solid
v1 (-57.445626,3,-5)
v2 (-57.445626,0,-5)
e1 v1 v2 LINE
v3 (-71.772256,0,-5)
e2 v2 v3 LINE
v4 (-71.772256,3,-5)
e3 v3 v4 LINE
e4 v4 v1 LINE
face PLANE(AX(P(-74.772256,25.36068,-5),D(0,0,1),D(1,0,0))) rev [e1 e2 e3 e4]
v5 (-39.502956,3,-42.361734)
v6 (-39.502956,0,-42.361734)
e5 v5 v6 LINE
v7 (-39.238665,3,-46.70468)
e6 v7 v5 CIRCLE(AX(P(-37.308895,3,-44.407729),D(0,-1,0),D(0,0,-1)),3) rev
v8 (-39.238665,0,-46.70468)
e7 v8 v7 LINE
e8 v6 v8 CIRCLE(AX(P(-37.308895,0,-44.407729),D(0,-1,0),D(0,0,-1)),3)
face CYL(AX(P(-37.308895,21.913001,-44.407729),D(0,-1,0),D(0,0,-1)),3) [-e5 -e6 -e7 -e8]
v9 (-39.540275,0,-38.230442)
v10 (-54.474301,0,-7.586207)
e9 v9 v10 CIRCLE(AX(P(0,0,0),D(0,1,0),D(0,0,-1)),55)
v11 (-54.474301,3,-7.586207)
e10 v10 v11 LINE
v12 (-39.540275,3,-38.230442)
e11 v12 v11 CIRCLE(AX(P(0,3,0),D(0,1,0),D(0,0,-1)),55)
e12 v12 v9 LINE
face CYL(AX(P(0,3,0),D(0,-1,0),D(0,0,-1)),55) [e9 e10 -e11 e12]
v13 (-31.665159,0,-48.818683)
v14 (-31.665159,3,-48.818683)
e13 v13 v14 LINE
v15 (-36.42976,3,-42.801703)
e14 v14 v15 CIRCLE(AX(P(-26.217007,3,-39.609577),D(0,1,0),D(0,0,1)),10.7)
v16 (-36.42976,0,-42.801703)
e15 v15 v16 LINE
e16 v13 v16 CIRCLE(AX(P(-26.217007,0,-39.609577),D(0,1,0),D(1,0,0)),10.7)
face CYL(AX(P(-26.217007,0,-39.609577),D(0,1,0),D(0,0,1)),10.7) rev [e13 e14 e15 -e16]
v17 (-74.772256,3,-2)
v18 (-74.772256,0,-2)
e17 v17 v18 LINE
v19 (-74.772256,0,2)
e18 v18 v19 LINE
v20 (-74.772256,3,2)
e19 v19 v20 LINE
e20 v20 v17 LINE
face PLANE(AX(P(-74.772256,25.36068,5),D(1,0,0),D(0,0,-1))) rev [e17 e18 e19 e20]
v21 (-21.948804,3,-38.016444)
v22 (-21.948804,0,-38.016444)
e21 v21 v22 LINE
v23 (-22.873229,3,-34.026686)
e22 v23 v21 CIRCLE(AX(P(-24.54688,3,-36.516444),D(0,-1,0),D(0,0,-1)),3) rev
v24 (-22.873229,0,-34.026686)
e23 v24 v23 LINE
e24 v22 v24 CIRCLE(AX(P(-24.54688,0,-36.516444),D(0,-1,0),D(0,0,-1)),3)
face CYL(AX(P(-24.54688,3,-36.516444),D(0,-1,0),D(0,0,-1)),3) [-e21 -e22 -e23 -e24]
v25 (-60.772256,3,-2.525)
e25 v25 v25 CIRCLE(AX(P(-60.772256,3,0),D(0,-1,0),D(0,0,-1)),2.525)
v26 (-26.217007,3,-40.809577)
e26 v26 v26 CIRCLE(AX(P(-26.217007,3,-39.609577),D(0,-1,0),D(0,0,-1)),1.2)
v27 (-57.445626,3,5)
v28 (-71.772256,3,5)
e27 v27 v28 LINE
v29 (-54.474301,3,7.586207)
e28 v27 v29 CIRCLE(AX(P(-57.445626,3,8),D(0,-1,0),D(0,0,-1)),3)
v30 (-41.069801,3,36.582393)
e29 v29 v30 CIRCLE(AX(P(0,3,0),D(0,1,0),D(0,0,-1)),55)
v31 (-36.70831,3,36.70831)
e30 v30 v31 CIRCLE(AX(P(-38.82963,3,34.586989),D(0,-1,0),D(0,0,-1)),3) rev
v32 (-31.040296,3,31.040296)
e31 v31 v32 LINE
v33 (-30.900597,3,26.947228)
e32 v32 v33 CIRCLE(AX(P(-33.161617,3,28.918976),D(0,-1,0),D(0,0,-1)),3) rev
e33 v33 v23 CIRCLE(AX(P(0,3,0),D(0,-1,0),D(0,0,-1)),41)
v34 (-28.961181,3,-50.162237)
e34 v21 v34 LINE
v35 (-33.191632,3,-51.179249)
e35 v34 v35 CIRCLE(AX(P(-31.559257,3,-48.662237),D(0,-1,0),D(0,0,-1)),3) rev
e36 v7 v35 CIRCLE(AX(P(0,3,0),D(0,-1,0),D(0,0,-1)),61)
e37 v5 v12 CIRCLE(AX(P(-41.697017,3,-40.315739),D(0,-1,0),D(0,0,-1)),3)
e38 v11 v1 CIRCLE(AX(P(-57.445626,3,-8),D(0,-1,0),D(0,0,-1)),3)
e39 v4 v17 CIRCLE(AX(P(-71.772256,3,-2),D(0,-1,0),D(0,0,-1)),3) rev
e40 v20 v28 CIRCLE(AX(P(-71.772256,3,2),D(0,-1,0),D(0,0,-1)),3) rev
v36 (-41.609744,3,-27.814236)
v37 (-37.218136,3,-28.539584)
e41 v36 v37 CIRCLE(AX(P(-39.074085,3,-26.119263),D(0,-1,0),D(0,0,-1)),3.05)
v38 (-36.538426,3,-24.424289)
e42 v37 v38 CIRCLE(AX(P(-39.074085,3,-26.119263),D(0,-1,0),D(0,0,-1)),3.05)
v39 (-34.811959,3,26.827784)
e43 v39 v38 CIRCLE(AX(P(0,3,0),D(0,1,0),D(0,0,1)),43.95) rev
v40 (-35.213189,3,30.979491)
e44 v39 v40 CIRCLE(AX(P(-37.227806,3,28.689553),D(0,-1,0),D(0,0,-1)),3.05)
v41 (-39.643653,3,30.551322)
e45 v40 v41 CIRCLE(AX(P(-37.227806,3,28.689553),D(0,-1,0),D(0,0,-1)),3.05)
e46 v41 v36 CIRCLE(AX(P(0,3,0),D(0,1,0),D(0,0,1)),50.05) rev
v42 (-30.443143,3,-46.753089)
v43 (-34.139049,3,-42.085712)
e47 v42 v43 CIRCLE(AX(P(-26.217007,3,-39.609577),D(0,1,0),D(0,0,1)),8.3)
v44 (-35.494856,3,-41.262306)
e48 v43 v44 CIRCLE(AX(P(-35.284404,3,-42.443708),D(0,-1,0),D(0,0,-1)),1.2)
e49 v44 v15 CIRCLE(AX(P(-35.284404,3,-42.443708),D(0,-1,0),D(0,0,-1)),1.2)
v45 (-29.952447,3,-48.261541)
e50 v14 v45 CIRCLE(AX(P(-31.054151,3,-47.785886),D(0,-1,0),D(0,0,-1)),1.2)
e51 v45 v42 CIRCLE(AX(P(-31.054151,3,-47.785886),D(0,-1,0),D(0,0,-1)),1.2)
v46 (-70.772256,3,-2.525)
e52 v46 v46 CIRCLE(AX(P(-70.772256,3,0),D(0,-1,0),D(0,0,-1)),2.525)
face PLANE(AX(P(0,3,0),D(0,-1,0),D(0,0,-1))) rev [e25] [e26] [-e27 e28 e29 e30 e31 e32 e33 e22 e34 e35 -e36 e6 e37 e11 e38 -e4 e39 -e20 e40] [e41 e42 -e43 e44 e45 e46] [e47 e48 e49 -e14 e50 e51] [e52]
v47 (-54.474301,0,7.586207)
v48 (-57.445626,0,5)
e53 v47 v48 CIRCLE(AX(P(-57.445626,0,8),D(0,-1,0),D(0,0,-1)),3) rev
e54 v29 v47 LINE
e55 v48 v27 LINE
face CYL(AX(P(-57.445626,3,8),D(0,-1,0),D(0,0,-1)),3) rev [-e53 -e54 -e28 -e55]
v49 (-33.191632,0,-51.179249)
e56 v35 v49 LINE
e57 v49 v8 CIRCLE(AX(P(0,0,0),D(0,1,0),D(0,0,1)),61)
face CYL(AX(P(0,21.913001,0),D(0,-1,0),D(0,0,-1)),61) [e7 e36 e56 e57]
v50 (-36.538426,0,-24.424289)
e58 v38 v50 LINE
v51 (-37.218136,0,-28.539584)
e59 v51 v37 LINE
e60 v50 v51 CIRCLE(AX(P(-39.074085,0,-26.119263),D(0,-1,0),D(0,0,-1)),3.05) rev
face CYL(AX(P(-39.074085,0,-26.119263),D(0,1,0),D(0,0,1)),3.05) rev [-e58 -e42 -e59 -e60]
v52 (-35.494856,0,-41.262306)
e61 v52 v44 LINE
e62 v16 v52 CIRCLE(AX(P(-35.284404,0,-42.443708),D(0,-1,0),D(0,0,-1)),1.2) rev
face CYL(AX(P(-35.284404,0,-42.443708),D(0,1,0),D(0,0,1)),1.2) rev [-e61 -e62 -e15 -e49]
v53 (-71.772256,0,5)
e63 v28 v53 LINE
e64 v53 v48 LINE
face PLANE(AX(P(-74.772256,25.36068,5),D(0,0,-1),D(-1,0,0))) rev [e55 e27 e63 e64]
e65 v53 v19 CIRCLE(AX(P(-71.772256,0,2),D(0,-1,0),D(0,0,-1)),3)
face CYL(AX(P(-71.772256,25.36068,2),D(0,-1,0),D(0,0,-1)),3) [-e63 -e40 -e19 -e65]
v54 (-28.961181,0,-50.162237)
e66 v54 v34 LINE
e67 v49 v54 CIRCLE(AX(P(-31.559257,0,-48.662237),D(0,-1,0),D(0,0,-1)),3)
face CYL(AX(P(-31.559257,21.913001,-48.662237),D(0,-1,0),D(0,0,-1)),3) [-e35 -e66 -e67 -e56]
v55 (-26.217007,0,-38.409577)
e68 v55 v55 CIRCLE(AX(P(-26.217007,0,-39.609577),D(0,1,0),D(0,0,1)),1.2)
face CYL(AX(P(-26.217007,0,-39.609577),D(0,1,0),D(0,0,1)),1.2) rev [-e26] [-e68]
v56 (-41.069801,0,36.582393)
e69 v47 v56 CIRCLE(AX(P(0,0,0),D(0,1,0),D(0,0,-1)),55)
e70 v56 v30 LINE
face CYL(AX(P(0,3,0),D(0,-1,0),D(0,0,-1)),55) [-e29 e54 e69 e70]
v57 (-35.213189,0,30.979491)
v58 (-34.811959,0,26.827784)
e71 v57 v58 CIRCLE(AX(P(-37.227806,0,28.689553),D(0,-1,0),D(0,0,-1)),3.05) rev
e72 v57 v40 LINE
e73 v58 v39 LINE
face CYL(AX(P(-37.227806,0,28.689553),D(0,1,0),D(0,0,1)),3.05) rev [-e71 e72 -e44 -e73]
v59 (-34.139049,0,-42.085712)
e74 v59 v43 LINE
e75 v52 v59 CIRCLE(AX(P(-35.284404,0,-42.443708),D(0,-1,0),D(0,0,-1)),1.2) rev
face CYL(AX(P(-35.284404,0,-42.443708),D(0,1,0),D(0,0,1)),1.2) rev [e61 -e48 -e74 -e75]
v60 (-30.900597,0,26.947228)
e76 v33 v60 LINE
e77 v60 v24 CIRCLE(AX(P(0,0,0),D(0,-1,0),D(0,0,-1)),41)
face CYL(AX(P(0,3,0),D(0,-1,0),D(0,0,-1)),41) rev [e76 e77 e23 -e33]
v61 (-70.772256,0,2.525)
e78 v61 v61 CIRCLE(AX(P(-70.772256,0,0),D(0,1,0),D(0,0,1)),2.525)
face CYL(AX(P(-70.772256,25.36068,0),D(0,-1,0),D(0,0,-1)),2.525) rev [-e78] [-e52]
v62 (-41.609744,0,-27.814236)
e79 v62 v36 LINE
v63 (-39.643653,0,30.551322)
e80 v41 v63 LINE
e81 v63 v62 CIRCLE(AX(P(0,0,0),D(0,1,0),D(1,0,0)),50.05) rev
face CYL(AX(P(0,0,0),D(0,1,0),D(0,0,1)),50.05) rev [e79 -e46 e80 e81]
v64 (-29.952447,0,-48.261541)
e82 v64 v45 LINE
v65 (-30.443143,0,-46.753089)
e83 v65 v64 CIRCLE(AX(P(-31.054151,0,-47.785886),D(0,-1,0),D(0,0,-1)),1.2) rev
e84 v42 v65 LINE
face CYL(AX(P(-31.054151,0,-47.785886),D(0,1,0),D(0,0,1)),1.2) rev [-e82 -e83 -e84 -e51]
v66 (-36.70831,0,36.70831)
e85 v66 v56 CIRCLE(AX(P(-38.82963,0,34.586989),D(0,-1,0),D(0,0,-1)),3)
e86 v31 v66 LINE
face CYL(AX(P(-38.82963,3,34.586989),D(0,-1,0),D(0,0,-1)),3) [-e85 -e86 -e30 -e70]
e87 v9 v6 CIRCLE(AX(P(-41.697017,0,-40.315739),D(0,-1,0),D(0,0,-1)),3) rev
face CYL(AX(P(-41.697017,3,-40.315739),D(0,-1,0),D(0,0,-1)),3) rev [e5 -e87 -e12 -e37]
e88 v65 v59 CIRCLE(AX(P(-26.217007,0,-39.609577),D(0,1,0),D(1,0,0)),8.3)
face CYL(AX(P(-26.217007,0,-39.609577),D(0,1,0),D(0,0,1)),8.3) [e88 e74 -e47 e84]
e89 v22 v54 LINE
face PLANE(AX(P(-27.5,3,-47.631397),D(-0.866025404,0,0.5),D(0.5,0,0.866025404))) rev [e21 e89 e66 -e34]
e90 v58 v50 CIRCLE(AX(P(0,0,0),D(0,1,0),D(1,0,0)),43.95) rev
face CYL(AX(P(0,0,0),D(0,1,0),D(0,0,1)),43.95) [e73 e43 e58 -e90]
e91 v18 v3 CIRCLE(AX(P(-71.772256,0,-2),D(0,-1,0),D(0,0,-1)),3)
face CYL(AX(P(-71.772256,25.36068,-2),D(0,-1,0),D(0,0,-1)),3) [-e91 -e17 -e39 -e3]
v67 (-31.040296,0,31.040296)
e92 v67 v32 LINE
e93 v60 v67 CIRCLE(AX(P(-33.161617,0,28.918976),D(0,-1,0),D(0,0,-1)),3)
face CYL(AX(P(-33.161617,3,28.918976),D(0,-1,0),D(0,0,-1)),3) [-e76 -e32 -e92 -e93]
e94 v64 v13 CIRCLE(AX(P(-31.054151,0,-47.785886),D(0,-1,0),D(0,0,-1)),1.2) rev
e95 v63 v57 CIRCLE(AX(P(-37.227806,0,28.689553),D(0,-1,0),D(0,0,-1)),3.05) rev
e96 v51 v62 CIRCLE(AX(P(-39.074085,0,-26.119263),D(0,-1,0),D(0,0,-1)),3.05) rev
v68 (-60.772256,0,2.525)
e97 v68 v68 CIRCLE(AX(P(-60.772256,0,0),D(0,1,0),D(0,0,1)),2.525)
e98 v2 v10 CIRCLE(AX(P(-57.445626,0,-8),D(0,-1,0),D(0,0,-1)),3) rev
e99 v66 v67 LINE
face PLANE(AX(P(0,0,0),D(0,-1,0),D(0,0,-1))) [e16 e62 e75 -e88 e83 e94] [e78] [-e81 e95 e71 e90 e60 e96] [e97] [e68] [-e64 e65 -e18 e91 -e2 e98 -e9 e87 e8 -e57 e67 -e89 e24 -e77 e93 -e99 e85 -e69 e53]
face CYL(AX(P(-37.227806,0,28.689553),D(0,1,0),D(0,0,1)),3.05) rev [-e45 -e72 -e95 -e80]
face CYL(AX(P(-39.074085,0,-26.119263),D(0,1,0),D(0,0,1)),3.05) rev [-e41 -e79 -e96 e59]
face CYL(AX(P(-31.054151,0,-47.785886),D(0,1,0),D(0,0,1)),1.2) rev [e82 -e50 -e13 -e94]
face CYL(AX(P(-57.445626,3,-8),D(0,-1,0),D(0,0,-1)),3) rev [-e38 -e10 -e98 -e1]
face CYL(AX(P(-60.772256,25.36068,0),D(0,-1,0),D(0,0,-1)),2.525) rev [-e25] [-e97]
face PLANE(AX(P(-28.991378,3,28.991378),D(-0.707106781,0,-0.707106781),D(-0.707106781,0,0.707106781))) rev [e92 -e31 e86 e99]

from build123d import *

# Parameters (mm, degrees)
BOSS_EXTRUDE1_DEPTH          = 3
CUT_EXTRUDE_THIN1_DEPTH      = 73.819983521
CUT_EXTRUDE_THIN1_DEPTH_BACK = 3
FILLET1_R                    = 3.05
BOSS_EXTRUDE2_DEPTH          = 3
CUT_EXTRUDE1_DEPTH           = 77.32004979
CUT_EXTRUDE1_DEPTH_BACK      = 77.32004979
SKETCH4_R                    = 1.2
CUT_EXTRUDE_THIN2_DEPTH      = 77.32004979
CUT_EXTRUDE_THIN2_DEPTH_BACK = 3
FILLET2_R                    = 1.2
SKETCH6_W                    = 20
SKETCH6_H                    = 10
SKETCH6_R                    = 2.525
BOSS_EXTRUDE3_DEPTH          = 3
FILLET3_R                    = 3


with BuildPart() as part:
    # Sketch1 → Boss-Extrude1 (new body)
    with BuildSketch(Plane(origin=(0, 0, 0), x_dir=(1, 0, 0), z_dir=(0, 1, 0))):
        with BuildLine():
            Line((-27.5, 47.631397208), (-20.5, 35.507041555))
            ThreePointArc((-20.5, 35.507041555), (-40.649239316, 5.351573881), (-28.991378029, -28.991378029))
            Line((-28.991378029, -28.991378029), (-38.890872965, -38.890872965))
            ThreePointArc((-38.890872965, -38.890872965), (-54.529467376, 7.178940572), (-27.5, 47.631397208))
        make_face()
    extrude(amount=BOSS_EXTRUDE1_DEPTH)

    # Sketch2 → Cut-Extrude-Thin1 (cut, two sides: drawn at the far end of the back side and taken through both)
    with BuildSketch(Plane(origin=(0, 3, 0), x_dir=(1, 0, 0), z_dir=(0, 1, 0)).offset(-CUT_EXTRUDE_THIN1_DEPTH_BACK)):
        with BuildLine():
            ThreePointArc((-32.997630308, -29.03030992), (-43.925085447, -1.479651456), (-34.876429564, 26.743918204))
            Line((-34.876429564, 26.743918204), (-39.717071665, 30.455815838))
            ThreePointArc((-39.717071665, 30.455815838), (-50.021627455, -1.685018325), (-37.577506187, -33.0595452))
            Line((-37.577506187, -33.0595452), (-32.997630308, -29.03030992))
        make_face()
    extrude(amount=CUT_EXTRUDE_THIN1_DEPTH + CUT_EXTRUDE_THIN1_DEPTH_BACK, mode=Mode.SUBTRACT)

    # Fillet1
    fillet1_edges = [part.edges().sort_by_distance(p)[0] for p in [
        (-39.717071665, 1.5, -30.455815838),
        (-34.876429564, 1.5, -26.743918204),
        (-32.997630308, 1.5, 29.03030992),
        (-37.577506187, 1.5, 33.0595452),
    ]]
    fillet(fillet1_edges, radius=FILLET1_R - 0.0001)  # a hair under: the kernel refuses the full size

    # Sketch3 → Boss-Extrude2 (add)
    with BuildSketch(Plane(origin=(0, 0, 0), x_dir=(1, 0, 0), z_dir=(0, 1, 0))):
        with BuildLine():
            Line((-27.5, 47.631397208), (-30.5, 52.827549631))
            ThreePointArc((-30.5, 52.827549631), (-36.284189992, 49.035268498), (-41.601899964, 44.612575799))
            Line((-41.601899964, 44.612575799), (-37.509909803, 40.224453589))
            ThreePointArc((-37.509909803, 40.224453589), (-32.715253271, 44.212127334), (-27.5, 47.631397208))
        make_face()
    extrude(amount=BOSS_EXTRUDE2_DEPTH)

    # Sketch4 → Cut-Extrude1 (cut, two sides: drawn at the far end of the back side and taken through both)
    with BuildSketch(Plane(origin=(0, 3, 0), x_dir=(1, 0, 0), z_dir=(0, 1, 0)).offset(-CUT_EXTRUDE1_DEPTH_BACK)):
        with Locations(Location((-26.217006802, 39.609576548, 0), (0, 0, 270))):
            Circle(SKETCH4_R)
    extrude(amount=CUT_EXTRUDE1_DEPTH + CUT_EXTRUDE1_DEPTH_BACK, mode=Mode.SUBTRACT)

    # Sketch5 → Cut-Extrude-Thin2 (cut, two sides: drawn at the far end of the back side and taken through both)
    with BuildSketch(Plane(origin=(0, 3, 0), x_dir=(1, 0, 0), z_dir=(0, 1, 0)).offset(-CUT_EXTRUDE_THIN2_DEPTH_BACK)):
        with BuildLine():
            ThreePointArc((-30.458263972, 49.433106342), (-34.605510743, 46.252091255), (-36.751172642, 41.486102609))
            Line((-36.751172642, 41.486102609), (-34.388369089, 41.065199567))
            ThreePointArc((-34.388369089, 41.065199567), (-32.723977149, 44.762181415), (-29.506953953, 47.22969779))
            Line((-29.506953953, 47.22969779), (-30.458263972, 49.433106342))
        make_face()
    extrude(amount=CUT_EXTRUDE_THIN2_DEPTH + CUT_EXTRUDE_THIN2_DEPTH_BACK, mode=Mode.SUBTRACT)

    # Fillet2
    fillet2_edges = [part.edges().sort_by_distance(p)[0] for p in [
        (-34.388369089, 1.5, -41.065199567),
        (-36.751172642, 1.5, -41.486102609),
        (-30.458263972, 1.5, -49.433106342),
        (-29.506953953, 1.5, -47.22969779),
    ]]
    fillet(fillet2_edges, radius=FILLET2_R - 0.0001)  # a hair under: the kernel refuses the full size

    # Sketch6 → Boss-Extrude3 (add)
    with BuildSketch(Plane(origin=(0, 0, 0), x_dir=(1, 0, 0), z_dir=(0, 1, 0))):
        with Locations((-64.772255751, 0)):
            Rectangle(SKETCH6_W, SKETCH6_H)
        with Locations(Location((-70.772255751, 0, 0), (0, 0, 90))):
            Circle(SKETCH6_R, mode=Mode.SUBTRACT)
        with Locations(Location((-60.772255751, 0, 0), (0, 0, 90))):
            Circle(SKETCH6_R, mode=Mode.SUBTRACT)
    extrude(amount=BOSS_EXTRUDE3_DEPTH)

    # Fillet3
    fillet3_edges = [part.edges().sort_by_distance(p)[0] for p in [
        (-74.772255751, 1.5, 5),
        (-74.772255751, 1.5, -5),
        (-54.772255751, 1.5, 5),
        (-54.772255751, 1.5, -5),
        (-37.509909803, 1.5, -40.224453589),
        (-41.601899964, 1.5, -44.612575799),
        (-30.5, 1.5, -52.827549631),
        (-20.5, 1.5, -35.507041555),
        (-28.991378029, 1.5, 28.991378029),
        (-38.890872965, 1.5, 38.890872965),
    ]]
    fillet(fillet3_edges, radius=FILLET3_R - 0.0001)  # a hair under: the kernel refuses the full size


solid = part.part
